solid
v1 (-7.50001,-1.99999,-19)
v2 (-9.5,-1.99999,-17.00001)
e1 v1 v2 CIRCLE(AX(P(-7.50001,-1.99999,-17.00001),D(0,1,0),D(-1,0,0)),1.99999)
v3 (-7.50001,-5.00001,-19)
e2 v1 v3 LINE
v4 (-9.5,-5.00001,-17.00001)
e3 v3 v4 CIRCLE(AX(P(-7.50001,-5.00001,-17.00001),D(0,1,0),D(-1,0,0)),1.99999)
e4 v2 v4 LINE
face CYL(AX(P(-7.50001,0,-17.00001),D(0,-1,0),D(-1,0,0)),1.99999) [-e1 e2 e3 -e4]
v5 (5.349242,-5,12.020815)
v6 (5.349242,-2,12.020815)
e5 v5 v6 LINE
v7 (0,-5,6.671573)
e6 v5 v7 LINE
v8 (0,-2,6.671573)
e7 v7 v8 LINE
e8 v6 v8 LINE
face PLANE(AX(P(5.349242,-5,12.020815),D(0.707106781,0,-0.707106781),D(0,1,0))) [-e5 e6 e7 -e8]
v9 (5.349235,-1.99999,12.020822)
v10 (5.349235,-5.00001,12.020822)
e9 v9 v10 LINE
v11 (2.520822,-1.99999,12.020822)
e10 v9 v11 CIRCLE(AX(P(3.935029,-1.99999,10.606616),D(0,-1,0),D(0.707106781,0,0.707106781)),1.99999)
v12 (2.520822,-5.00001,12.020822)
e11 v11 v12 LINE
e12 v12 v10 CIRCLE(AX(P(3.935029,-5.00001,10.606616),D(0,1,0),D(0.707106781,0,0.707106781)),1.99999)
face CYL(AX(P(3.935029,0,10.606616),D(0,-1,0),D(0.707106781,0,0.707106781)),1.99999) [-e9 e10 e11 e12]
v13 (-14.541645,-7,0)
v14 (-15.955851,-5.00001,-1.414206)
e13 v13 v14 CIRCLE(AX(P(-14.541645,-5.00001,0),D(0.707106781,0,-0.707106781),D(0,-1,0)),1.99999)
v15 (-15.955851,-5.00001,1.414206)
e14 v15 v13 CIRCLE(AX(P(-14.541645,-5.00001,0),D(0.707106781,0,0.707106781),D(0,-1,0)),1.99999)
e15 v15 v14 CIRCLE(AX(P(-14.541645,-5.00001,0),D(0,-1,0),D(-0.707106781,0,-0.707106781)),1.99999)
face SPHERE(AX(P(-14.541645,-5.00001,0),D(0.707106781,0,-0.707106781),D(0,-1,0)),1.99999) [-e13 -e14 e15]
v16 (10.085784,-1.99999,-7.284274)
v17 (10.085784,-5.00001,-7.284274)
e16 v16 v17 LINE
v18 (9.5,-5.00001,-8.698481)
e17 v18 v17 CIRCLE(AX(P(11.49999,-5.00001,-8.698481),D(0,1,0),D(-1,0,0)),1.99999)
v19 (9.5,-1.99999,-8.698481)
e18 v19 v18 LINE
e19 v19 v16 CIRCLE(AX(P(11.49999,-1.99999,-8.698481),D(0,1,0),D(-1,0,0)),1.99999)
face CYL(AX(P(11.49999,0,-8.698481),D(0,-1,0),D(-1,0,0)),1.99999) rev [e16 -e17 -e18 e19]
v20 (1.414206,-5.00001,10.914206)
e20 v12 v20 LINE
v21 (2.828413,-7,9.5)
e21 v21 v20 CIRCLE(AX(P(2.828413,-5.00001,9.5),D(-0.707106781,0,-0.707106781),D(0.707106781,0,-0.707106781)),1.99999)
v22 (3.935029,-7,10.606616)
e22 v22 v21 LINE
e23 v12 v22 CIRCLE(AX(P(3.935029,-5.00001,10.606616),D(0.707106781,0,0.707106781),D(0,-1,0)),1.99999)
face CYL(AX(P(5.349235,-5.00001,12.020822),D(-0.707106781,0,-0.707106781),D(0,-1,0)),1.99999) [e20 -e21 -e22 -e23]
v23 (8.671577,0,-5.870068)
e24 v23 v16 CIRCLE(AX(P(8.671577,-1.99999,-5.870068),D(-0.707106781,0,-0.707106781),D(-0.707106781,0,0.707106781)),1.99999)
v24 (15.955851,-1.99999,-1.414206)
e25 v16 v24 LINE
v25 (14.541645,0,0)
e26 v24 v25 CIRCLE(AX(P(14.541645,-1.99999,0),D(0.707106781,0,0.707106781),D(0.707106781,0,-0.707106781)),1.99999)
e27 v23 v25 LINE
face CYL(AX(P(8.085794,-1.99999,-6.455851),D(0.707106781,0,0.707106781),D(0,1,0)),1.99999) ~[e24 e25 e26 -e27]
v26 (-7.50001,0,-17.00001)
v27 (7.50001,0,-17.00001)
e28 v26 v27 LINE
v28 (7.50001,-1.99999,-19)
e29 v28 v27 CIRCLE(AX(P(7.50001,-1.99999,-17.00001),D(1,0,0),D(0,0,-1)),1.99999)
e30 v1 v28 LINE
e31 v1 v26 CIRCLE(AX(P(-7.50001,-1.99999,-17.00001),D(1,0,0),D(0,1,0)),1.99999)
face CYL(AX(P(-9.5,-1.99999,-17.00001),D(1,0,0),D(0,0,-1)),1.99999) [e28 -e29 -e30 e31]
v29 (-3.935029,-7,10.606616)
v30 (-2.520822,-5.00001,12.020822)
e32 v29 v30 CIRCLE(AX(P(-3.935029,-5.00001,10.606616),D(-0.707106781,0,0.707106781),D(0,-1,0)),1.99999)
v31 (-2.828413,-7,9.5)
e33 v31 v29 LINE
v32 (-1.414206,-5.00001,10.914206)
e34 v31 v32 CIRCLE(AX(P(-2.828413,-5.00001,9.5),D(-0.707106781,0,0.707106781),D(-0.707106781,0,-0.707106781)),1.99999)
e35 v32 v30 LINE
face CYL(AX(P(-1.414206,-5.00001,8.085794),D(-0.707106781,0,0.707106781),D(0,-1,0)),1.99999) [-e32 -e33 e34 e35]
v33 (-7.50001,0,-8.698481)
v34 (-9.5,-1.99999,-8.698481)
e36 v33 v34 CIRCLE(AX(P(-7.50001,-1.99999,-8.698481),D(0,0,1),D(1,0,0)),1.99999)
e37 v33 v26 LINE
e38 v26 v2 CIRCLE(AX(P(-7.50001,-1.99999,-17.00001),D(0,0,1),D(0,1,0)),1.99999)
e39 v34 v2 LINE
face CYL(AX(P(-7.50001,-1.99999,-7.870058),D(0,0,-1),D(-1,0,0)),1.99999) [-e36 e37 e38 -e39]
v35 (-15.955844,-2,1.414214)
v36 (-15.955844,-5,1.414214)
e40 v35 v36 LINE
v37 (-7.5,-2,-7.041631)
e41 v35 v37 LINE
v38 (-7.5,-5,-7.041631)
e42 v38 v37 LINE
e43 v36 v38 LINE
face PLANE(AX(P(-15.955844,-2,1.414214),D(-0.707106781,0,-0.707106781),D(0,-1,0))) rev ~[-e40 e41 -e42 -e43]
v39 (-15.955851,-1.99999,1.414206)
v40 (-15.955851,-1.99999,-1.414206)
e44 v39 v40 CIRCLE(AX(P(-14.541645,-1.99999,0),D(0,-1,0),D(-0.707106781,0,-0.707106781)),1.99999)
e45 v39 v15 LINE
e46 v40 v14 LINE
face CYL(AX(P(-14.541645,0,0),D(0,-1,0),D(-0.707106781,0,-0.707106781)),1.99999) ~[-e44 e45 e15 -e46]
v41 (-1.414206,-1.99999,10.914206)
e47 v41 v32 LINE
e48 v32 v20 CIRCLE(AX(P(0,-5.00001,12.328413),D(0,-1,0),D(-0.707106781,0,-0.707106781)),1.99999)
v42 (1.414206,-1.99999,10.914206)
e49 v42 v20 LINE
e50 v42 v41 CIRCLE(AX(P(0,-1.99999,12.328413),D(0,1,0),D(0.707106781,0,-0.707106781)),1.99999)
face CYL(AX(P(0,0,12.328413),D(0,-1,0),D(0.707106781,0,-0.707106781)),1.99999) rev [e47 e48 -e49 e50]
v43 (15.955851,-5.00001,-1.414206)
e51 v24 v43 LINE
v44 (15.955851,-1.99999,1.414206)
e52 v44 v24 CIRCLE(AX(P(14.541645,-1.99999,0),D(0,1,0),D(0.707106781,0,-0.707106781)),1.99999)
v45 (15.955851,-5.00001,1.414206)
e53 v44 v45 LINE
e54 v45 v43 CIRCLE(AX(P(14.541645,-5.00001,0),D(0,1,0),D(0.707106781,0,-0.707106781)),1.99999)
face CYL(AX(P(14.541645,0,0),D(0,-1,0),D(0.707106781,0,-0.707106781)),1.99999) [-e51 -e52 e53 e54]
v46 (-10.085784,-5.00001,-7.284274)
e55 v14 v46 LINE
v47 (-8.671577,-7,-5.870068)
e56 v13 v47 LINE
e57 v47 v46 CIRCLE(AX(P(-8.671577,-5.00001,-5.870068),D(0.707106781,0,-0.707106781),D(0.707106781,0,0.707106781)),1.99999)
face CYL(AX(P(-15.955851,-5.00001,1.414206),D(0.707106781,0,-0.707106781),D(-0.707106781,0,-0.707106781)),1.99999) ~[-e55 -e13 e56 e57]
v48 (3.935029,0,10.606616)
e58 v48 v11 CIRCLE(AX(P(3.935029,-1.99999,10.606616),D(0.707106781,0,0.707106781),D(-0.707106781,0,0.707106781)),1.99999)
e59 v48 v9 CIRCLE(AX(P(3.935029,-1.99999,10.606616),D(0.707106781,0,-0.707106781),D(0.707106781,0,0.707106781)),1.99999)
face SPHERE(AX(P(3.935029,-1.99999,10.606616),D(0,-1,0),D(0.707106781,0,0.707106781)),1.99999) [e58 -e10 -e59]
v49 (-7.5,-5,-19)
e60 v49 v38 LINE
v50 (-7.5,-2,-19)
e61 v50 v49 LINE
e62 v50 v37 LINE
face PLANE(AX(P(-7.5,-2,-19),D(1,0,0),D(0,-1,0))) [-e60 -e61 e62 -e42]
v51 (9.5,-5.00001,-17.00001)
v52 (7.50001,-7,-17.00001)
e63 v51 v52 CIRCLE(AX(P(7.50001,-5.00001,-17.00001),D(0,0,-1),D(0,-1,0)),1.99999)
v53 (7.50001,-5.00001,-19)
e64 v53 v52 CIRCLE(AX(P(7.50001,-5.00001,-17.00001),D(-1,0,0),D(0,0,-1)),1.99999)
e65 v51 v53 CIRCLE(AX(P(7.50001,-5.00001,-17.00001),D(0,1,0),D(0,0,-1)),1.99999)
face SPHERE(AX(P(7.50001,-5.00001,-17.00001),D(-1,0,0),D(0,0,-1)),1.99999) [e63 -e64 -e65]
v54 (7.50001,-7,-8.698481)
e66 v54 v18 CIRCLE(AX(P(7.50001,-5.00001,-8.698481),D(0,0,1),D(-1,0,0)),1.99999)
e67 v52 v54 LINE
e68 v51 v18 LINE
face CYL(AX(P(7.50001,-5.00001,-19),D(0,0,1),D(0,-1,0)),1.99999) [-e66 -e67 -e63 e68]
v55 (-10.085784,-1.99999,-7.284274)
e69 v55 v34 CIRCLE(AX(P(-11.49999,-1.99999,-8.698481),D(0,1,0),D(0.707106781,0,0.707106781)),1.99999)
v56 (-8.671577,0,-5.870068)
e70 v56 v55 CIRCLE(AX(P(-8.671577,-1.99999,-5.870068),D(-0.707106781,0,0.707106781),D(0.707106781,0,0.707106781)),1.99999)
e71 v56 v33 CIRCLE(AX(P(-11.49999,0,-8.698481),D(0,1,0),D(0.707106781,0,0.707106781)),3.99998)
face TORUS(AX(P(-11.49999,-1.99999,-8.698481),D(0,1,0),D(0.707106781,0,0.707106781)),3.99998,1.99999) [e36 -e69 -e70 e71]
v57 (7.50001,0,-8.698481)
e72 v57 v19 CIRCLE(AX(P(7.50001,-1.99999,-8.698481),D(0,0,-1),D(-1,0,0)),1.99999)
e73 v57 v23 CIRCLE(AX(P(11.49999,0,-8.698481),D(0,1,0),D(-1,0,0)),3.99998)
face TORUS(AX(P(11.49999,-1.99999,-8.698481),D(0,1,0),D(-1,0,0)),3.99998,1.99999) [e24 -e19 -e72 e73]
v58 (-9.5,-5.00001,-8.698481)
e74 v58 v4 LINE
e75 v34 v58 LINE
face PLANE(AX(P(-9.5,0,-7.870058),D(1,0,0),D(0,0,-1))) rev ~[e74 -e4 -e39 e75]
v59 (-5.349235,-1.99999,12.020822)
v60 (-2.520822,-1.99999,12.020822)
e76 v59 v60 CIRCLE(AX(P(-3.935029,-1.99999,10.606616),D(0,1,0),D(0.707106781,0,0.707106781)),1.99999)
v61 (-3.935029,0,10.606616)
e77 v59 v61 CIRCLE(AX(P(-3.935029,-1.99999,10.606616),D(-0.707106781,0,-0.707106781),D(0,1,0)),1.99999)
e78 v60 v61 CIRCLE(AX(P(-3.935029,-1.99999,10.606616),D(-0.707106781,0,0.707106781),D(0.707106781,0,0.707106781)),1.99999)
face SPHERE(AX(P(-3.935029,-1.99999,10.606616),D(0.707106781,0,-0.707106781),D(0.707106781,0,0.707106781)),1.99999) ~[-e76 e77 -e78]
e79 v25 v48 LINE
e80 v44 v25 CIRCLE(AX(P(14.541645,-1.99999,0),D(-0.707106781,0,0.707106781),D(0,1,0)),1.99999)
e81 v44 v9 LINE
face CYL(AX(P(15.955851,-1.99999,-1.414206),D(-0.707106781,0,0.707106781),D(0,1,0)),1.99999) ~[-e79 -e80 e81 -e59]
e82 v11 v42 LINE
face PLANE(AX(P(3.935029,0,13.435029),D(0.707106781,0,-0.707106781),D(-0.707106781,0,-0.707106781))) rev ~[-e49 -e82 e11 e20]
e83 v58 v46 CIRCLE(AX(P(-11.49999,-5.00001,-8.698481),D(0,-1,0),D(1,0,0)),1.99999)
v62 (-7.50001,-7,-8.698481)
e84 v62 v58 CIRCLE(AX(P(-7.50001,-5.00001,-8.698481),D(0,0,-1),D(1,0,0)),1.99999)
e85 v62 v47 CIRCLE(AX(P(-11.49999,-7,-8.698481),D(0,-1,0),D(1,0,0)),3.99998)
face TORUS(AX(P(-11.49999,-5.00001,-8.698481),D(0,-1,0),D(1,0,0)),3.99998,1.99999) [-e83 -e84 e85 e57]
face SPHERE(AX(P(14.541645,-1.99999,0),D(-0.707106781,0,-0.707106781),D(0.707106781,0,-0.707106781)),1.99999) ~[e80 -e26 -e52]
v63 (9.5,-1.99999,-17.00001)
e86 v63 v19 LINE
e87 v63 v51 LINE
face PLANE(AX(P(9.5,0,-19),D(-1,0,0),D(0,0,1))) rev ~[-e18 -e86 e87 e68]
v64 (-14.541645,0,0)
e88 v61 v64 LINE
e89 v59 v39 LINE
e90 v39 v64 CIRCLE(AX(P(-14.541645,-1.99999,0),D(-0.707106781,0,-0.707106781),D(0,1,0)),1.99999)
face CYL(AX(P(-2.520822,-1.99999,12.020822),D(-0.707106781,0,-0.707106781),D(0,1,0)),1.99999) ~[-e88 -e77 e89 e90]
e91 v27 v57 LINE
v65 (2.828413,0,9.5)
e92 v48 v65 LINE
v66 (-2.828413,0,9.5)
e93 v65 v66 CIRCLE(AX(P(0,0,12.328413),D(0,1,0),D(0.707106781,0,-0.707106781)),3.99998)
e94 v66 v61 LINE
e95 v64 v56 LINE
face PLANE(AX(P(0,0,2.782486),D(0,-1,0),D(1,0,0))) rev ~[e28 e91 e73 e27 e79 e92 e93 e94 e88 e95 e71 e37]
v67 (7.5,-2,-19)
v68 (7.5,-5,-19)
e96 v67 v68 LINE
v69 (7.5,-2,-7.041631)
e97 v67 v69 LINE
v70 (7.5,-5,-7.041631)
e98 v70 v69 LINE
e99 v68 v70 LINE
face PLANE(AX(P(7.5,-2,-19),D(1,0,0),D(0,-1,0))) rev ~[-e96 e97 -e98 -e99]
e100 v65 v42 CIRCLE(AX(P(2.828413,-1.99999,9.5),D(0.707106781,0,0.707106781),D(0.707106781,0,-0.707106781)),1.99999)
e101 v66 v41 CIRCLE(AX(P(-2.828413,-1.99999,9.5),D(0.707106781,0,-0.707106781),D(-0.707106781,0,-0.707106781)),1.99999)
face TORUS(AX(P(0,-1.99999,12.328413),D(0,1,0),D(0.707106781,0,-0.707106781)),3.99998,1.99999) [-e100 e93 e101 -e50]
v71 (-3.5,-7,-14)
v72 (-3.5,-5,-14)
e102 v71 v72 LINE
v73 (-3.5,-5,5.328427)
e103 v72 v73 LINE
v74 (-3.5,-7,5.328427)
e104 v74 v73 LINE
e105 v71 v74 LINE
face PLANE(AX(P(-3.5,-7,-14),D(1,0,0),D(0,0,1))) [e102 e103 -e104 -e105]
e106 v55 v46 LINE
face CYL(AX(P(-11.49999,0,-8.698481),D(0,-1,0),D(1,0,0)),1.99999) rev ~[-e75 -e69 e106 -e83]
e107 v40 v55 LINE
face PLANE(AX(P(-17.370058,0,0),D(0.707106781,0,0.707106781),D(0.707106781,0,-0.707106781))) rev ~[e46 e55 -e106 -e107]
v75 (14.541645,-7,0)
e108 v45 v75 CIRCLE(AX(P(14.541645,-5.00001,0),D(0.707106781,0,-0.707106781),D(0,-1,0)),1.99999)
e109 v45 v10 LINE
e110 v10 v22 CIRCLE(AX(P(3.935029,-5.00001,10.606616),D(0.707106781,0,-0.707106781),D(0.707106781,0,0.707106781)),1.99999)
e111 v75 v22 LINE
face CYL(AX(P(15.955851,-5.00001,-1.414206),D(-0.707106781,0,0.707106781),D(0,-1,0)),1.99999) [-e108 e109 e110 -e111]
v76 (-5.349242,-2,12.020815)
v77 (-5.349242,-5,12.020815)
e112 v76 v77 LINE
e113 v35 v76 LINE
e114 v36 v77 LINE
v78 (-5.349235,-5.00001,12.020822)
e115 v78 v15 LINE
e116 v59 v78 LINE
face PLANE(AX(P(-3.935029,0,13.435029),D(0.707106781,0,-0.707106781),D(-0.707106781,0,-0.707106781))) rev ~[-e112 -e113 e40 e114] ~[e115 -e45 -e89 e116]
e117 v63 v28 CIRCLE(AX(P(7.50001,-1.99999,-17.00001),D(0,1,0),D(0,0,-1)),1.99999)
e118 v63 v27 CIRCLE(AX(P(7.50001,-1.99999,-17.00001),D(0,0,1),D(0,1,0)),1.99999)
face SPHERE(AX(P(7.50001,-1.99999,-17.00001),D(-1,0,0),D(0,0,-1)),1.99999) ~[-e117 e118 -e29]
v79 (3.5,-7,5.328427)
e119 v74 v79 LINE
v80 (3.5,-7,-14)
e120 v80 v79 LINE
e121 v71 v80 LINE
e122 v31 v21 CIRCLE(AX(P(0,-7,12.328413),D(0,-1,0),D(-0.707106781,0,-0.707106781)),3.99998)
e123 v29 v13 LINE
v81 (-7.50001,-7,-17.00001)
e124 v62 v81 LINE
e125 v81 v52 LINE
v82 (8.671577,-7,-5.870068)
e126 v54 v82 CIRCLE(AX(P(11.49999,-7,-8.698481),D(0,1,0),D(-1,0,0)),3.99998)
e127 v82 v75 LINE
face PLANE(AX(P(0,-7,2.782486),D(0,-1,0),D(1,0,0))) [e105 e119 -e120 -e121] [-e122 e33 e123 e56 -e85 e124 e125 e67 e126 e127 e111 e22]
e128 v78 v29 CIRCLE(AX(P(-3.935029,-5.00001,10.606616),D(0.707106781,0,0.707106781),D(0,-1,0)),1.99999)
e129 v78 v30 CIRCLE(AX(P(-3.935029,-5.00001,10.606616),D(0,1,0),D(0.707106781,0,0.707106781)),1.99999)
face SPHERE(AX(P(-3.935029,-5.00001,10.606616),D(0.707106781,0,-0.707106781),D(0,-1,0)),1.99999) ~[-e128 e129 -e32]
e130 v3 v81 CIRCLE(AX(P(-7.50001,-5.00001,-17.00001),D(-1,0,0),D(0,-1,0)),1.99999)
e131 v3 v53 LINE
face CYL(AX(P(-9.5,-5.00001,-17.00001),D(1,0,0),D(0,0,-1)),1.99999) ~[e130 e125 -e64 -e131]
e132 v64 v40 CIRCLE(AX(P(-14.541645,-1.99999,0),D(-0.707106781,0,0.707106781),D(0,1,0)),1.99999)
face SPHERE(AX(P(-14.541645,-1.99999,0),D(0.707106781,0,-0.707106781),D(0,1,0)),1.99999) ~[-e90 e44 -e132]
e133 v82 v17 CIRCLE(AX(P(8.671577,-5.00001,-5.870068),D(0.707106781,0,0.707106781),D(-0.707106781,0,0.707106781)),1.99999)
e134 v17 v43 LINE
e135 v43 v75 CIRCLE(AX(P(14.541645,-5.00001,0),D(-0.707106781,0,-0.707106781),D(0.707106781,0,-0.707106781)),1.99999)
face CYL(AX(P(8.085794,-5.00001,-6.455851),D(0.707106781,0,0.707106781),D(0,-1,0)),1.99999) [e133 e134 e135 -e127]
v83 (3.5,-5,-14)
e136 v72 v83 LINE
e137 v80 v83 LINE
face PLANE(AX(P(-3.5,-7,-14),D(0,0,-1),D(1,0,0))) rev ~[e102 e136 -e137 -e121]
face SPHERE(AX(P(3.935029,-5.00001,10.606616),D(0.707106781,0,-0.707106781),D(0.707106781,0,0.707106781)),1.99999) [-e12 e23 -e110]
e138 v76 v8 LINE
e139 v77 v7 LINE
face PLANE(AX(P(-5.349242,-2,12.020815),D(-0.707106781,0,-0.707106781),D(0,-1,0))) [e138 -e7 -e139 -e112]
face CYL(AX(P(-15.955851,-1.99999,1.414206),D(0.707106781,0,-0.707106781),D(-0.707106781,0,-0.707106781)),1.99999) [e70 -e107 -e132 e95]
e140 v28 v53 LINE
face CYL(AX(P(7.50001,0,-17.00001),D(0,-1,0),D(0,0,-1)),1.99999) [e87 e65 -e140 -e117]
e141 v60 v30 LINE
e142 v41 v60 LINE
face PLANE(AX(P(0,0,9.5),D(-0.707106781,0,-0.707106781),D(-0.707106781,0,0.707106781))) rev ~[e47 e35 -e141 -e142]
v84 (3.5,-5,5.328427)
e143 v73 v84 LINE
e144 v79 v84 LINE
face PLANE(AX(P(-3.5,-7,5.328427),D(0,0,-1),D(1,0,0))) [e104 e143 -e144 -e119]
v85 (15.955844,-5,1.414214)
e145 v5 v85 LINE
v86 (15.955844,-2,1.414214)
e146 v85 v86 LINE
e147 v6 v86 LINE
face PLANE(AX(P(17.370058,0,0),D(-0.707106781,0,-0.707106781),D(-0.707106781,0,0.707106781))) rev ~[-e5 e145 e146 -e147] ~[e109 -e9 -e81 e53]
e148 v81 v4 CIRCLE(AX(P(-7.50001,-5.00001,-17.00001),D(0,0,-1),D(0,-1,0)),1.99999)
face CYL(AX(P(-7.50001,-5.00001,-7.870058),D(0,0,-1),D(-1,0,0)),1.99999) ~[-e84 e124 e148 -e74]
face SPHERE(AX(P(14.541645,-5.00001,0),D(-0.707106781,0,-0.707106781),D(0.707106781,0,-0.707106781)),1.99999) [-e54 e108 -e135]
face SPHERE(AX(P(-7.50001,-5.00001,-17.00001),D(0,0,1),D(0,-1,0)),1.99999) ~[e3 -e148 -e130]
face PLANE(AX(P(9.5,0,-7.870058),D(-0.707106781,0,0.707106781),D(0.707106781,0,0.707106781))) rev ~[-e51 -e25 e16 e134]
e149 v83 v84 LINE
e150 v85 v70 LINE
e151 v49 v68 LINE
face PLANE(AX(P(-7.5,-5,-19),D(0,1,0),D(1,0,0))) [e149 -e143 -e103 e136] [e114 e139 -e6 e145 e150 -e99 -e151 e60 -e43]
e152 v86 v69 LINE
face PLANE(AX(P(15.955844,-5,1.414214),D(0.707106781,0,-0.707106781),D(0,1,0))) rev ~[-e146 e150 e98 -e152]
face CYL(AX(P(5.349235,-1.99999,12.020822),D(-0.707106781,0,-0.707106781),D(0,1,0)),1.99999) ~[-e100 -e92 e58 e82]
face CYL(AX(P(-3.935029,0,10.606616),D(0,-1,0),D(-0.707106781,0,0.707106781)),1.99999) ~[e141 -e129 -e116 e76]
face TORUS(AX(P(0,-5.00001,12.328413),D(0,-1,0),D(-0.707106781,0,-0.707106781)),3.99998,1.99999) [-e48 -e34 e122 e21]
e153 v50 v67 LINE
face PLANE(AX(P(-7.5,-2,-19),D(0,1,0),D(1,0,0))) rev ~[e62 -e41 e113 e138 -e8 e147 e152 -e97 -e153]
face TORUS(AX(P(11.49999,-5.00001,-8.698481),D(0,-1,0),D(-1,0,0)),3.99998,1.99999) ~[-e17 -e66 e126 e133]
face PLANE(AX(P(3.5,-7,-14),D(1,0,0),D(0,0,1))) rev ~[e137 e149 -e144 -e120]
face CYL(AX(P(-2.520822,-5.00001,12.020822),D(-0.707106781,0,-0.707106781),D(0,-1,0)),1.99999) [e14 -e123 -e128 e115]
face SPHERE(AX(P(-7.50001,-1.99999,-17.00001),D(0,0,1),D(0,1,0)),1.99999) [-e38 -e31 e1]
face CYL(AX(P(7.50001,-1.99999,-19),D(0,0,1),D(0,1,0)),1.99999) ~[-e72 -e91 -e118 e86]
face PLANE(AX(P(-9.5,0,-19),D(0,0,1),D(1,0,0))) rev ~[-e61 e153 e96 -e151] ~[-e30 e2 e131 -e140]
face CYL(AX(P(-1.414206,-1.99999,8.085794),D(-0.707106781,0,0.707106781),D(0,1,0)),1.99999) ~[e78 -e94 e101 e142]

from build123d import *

# Parameters (mm, degrees)
F1_DEPTH  = 7
F2_W      = 15
F2_H      = 3
F3_DEPTH  = 25
F4_W      = 15
F4_H      = 3
F5_DEPTH  = 19.6
F6_W      = 3
F6_H      = 15
F7_DEPTH  = 21.3
F8_R      = 1.99999
F9_W      = 7
F9_H      = 19.3284271247
F10_DEPTH = 2


# Not quite as in the source:
# - a fillet or chamfer is up to 0.001 mm smaller than in the source, because OpenCascade refuses the exact size


with BuildPart() as f1:
    # F0 (on Front) → F1 (new body)
    with BuildSketch(Plane.XZ):
        Polygon((0, 9.5), (-9.5, 0), (9.5, 0), align=None)
        Polygon((9.5, 0), (-9.5, 0), (-9.5, -7.8700576851), (-9.5, -19), (9.5, -19), (9.5, -7.8700576851), align=None)
        Polygon((-9.5, -7.8700576851), (-9.5, 0), (0, 9.5), (-3.9350288425, 13.4350288425), (-17.3700576851, 0), align=None)
        Polygon((0, 9.5), (9.5, 0), (9.5, -7.8700576851), (17.3700576851, 0), (3.9350288425, 13.4350288425), align=None)
    extrude(amount=F1_DEPTH)

    # F2 (on face) → F3 (cut)
    with BuildSketch(Plane(origin=(0, 0, -19), x_dir=(1, 0, 0), z_dir=(0, 0, -1))):
        with Locations((0, 3.5)):
            Rectangle(F2_W, F2_H)
    extrude(amount=-F3_DEPTH, mode=Mode.SUBTRACT)

    # F4 (on face) → F5 (cut)
    with BuildSketch(Plane(origin=(8.6850288425, 0, 8.6850288425), x_dir=(0.7071067812, 0, -0.7071067812), z_dir=(0.7071067812, 0, 0.7071067812))):
        with Locations((2.7824855787, -3.5)):
            Rectangle(F4_W, F4_H)
    extrude(amount=-F5_DEPTH, mode=Mode.SUBTRACT)

    # F6 (on face) → F7 (cut)
    with BuildSketch(Plane(origin=(-8.6850288425, 0, 8.6850288425), x_dir=(0, -1, 0), z_dir=(-0.7071067812, 0, 0.7071067812))):
        with Locations((3.5, -2.7824855787)):
            Rectangle(F6_W, F6_H)
    extrude(amount=-F7_DEPTH, mode=Mode.SUBTRACT)

    # F8 (radius 2 in the source; OpenCascade refuses exactly that, so slightly less here)
    f8_edges = [f1.edges().sort_by_distance(p)[0] for p in [
        (-9.5, -7, -13.435029),
        (-13.435029, -7, -3.935029),
        (-13.435029, 0, -3.935029),
        (-9.5, 0, -13.435029),
        (0, -7, -19),
        (0, 0, -19),
        (-9.5, -3.5, -19),
        (9.5, -3.5, -19),
        (9.5, -7, -13.435029),
        (9.5, 0, -13.435029),
        (13.435029, 0, -3.935029),
        (13.435029, -7, -3.935029),
        (17.370058, -3.5, 0),
        (10.652543, -7, 6.717514),
        (3.935029, -3.5, 13.435029),
        (10.652543, 0, 6.717514),
        (1.967514, 0, 11.467514),
        (-1.967514, 0, 11.467514),
        (-1.967514, -7, 11.467514),
        (1.967514, -7, 11.467514),
        (-10.652543, -7, 6.717514),
        (-3.935029, -3.5, 13.435029),
        (-10.652543, 0, 6.717514),
        (-17.370058, -3.5, 0),
        (0, -3.5, 9.5),
        (-9.5, -3.5, -7.870058),
        (9.5, -3.5, -7.870058),
    ]]
    fillet(f8_edges, radius=F8_R)

    # F9 (on face) → F10 (cut)
    with BuildSketch(Plane.XZ.offset(7)):
        with Locations((0, -4.3357864376)):
            Rectangle(F9_W, F9_H)
    extrude(amount=-F10_DEPTH, mode=Mode.SUBTRACT)


solid = f1.part
